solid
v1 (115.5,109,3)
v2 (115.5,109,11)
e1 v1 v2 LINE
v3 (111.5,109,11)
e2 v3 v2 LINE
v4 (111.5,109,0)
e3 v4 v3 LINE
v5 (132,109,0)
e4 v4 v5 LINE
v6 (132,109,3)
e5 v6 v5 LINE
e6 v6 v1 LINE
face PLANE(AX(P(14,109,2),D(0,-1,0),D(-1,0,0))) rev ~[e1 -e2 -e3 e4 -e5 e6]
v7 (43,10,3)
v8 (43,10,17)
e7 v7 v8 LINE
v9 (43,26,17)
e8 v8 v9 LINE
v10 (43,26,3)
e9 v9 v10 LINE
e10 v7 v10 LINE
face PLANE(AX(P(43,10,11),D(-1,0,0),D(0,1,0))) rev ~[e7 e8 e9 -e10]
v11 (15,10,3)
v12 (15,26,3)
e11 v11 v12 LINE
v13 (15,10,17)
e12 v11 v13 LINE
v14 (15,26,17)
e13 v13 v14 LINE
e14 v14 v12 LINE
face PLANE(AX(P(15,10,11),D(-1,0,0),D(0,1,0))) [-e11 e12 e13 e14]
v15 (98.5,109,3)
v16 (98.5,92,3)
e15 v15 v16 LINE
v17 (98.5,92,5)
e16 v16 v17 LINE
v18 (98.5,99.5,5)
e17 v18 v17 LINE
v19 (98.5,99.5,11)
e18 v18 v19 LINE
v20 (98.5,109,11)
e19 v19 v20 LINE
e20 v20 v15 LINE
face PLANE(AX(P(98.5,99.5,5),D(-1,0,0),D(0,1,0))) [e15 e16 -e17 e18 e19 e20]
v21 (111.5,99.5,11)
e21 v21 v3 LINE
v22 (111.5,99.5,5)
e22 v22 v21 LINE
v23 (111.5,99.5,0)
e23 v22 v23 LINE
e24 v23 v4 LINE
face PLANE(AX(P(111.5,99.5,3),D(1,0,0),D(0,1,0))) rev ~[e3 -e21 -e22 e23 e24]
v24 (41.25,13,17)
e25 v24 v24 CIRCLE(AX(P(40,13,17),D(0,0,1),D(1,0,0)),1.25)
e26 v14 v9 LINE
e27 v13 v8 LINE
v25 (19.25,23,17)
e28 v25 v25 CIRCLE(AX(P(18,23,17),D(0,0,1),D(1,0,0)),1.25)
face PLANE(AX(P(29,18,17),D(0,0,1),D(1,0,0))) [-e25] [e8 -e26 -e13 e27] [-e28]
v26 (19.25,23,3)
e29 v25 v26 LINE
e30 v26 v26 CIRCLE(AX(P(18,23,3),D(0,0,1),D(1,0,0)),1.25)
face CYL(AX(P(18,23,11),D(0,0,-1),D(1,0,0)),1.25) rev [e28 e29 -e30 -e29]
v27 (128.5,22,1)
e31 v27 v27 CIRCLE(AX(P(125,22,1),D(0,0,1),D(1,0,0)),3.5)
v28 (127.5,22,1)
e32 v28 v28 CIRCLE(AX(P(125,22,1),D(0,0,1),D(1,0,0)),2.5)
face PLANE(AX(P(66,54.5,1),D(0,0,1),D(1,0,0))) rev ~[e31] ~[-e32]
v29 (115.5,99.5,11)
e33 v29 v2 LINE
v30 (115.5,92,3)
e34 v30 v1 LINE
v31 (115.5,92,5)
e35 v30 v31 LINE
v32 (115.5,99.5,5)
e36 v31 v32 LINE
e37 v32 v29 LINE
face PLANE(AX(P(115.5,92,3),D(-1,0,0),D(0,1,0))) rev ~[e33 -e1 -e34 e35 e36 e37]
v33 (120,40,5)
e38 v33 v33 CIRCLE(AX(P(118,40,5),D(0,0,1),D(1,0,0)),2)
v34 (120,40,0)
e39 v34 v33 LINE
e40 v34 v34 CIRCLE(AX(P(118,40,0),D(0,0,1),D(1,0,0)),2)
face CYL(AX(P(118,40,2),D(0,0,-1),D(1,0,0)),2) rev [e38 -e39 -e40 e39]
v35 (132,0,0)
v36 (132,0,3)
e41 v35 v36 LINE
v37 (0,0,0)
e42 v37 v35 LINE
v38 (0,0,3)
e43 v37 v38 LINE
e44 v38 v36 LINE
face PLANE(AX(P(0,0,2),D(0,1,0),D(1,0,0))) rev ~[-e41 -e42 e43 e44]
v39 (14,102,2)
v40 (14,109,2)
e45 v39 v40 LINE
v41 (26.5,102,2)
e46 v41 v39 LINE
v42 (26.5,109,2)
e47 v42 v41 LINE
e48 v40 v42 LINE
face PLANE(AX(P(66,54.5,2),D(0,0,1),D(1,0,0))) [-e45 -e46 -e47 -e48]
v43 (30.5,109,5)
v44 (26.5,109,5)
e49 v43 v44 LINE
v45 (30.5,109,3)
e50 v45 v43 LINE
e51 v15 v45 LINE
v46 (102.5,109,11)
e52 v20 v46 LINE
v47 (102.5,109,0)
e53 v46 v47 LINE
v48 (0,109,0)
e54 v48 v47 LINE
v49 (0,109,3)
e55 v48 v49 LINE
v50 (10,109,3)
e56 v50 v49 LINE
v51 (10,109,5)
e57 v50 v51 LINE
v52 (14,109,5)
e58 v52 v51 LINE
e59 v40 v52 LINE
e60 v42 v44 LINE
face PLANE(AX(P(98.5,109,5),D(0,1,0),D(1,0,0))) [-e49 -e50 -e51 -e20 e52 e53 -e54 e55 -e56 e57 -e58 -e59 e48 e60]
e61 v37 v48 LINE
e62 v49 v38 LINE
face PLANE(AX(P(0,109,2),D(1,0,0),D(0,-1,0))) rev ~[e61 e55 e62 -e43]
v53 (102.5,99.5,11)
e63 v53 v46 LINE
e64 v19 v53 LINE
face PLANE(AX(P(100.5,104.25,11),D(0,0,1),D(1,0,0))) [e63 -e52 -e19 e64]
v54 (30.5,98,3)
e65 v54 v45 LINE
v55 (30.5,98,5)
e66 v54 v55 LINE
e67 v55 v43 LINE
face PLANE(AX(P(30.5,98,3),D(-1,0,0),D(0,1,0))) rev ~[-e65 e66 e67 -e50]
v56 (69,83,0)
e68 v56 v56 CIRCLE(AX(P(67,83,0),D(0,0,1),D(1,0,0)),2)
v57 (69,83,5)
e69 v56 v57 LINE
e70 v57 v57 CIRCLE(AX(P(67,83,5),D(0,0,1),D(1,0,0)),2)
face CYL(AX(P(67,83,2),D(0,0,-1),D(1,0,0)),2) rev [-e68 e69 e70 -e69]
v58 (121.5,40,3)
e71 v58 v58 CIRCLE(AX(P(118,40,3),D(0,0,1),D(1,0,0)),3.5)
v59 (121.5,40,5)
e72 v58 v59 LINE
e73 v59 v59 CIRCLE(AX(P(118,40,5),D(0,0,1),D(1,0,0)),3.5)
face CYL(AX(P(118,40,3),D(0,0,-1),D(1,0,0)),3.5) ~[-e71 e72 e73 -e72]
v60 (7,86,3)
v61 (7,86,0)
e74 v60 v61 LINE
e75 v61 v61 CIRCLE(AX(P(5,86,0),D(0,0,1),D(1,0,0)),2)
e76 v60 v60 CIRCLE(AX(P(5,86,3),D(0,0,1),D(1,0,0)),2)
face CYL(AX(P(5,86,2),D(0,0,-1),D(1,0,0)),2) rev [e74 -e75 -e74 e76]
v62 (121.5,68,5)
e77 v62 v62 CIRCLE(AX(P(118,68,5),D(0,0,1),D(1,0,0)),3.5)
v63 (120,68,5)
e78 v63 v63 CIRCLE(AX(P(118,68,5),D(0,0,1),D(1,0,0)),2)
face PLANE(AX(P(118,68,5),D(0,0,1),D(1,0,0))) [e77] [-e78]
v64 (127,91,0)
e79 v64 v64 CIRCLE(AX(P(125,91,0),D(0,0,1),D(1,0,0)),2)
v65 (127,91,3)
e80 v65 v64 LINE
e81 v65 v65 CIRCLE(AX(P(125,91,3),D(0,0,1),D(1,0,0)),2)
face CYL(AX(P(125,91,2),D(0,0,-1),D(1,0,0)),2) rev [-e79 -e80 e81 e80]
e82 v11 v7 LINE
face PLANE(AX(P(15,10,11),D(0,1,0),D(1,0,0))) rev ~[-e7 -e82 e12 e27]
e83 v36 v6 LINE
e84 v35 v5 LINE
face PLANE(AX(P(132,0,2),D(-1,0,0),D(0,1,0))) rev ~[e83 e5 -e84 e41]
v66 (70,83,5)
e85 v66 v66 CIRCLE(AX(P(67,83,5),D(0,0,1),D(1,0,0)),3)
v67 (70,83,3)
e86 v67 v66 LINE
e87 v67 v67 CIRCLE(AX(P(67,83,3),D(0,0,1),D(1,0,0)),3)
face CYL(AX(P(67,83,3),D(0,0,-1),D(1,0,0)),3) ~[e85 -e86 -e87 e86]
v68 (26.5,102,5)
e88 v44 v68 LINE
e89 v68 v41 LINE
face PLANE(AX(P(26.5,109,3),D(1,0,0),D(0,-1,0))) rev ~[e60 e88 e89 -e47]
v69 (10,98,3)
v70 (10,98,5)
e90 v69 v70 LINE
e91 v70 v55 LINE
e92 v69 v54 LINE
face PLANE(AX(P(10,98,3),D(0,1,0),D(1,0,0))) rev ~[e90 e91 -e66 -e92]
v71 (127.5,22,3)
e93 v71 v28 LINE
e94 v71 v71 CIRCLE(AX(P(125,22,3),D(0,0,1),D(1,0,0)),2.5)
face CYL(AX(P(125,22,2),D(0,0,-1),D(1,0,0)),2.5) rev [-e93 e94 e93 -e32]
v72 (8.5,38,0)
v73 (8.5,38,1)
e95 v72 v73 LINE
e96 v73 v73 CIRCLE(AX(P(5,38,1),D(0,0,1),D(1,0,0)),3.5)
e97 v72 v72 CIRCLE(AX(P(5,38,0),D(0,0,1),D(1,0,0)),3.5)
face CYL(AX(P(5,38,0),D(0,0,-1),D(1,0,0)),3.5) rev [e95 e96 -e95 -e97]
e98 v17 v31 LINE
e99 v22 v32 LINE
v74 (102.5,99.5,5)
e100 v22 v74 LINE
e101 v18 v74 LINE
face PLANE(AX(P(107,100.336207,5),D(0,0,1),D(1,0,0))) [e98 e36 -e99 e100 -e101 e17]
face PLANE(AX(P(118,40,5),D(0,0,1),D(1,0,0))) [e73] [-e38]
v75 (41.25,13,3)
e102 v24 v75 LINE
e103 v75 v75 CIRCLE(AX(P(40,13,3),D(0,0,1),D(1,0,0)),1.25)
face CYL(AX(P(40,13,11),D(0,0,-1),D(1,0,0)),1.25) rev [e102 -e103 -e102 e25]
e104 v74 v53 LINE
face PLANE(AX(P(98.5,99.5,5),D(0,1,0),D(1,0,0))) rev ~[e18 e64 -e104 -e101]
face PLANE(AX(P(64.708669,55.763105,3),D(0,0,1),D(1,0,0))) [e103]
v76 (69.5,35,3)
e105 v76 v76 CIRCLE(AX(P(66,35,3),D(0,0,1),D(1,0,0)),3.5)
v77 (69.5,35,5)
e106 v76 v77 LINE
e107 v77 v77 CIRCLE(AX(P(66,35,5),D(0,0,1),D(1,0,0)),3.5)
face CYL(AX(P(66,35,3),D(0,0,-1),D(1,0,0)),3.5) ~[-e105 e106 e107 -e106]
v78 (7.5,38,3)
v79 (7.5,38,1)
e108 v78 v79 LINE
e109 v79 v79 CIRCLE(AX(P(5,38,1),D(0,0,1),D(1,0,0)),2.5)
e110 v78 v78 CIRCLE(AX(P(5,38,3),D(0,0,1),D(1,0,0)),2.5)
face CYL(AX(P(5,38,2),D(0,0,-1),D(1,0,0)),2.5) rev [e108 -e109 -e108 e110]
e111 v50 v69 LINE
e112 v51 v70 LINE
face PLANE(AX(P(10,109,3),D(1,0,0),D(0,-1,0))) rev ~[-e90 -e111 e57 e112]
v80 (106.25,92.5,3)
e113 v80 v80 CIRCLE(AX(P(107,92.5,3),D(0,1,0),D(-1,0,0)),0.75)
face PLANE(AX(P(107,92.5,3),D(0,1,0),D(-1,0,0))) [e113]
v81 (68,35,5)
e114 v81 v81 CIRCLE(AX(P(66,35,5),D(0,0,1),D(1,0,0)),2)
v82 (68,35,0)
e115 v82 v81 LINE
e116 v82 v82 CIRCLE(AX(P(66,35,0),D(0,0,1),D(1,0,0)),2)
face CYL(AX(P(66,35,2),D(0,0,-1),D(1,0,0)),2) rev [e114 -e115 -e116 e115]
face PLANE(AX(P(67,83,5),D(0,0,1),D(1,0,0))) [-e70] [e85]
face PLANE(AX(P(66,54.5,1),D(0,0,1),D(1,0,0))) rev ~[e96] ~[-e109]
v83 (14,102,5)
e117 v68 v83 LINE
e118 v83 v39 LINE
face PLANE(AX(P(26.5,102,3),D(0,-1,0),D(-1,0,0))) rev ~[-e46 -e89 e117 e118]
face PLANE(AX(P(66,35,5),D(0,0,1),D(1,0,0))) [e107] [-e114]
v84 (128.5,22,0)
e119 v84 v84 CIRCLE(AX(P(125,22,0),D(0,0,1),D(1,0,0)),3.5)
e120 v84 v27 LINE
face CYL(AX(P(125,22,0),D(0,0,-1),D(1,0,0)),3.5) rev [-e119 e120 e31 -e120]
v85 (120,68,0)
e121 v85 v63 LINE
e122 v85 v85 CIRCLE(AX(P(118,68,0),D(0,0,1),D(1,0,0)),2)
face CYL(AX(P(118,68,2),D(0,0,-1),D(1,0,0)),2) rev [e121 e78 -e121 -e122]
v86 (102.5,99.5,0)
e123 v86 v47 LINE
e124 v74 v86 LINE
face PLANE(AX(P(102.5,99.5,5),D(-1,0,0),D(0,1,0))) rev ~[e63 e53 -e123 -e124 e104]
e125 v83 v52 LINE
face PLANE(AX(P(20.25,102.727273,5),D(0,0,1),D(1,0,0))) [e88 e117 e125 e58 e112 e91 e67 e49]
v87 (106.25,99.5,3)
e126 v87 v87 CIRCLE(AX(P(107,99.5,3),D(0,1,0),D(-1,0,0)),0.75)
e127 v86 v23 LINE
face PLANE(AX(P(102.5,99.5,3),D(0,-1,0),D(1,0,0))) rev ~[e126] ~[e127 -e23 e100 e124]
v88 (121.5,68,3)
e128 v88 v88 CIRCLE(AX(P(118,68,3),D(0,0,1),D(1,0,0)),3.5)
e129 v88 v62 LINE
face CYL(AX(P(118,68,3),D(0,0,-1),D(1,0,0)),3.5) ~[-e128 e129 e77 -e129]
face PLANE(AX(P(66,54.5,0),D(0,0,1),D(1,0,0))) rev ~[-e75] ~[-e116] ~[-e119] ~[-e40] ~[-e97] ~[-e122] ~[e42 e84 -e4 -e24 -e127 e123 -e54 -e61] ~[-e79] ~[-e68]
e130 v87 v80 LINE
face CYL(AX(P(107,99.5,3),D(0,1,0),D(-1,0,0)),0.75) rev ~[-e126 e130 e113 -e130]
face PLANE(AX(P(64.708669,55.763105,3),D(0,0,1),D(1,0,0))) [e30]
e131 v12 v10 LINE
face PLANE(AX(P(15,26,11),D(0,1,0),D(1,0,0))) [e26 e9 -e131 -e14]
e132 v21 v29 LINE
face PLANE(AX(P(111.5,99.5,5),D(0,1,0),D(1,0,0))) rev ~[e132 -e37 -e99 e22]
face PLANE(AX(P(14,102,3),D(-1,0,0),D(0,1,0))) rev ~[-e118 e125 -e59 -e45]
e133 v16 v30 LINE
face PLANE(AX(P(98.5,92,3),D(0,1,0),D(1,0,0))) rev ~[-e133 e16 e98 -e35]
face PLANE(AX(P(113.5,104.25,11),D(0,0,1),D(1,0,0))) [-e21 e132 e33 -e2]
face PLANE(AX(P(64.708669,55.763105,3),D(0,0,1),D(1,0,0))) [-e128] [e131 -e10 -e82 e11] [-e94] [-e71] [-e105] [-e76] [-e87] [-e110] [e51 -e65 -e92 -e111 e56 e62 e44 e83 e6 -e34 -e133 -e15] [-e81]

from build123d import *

# Parameters (mm, degrees)
F0_W      = 132
F0_H      = 109
F0_R      = 3.5
F0_R_2    = 2
F1_DEPTH  = 1
F2_W      = 132
F2_H      = 109
F2_R      = 3.5
F2_R_2    = 2
F2_R_3    = 2.5
F3_DEPTH  = 1
F4_R      = 2.5
F4_R_2    = 2
F5_DEPTH  = 1
F6_W      = 9
F6_H      = 9.5
F7_DEPTH  = 3
F8_R      = 3
F8_R_2    = 2
F8_R_3    = 3.5
F8_W      = 28
F8_H      = 16
F8_R_4    = 1.25
F9_DEPTH  = 2
F10_W     = 4
F10_H     = 9.5
F9_FACE_W = 28
F9_FACE_H = 16
F9_FACE_R = 1.25
F11_DEPTH = 6
F12_R     = 0.75
F13_DEPTH = 7
F14_W     = 28
F14_H     = 16
F14_R     = 1.25
F15_DEPTH = 6


# Not quite as in the source:
# - a feature names something its author has since deleted; it is built from what else it names


with BuildPart() as f1:
    # F0 (on Top) → F1 (new body)
    with BuildSketch(Plane.XY):
        with Locations((66, 54.5)):
            Rectangle(F0_W, F0_H)
        with Locations((5, 38)):
            Circle(F0_R, mode=Mode.SUBTRACT)
        with Locations((125, 22)):
            Circle(F0_R, mode=Mode.SUBTRACT)
        with Locations((66, 35)):
            Circle(F0_R_2, mode=Mode.SUBTRACT)
        with Locations((118, 40)):
            Circle(F0_R_2, mode=Mode.SUBTRACT)
        with Locations((5, 86)):
            Circle(F0_R_2, mode=Mode.SUBTRACT)
        with Locations((118, 68)):
            Circle(F0_R_2, mode=Mode.SUBTRACT)
        with Locations((67, 83)):
            Circle(F0_R_2, mode=Mode.SUBTRACT)
        with Locations((125, 91)):
            Circle(F0_R_2, mode=Mode.SUBTRACT)
    extrude(amount=F1_DEPTH)

    # F2 (on face) → F3 (join)
    with BuildSketch(Plane.XY.offset(1)):
        with Locations((66, 54.5)):
            Rectangle(F2_W, F2_H)
        with Locations((5, 38)):
            Circle(F2_R, mode=Mode.SUBTRACT)
        with Locations((125, 22)):
            Circle(F2_R, mode=Mode.SUBTRACT)
        with Locations((66, 35)):
            Circle(F2_R_2, mode=Mode.SUBTRACT)
        with Locations((118, 40)):
            Circle(F2_R_2, mode=Mode.SUBTRACT)
        with Locations((5, 86)):
            Circle(F2_R_2, mode=Mode.SUBTRACT)
        with Locations((118, 68)):
            Circle(F2_R_2, mode=Mode.SUBTRACT)
        with Locations((67, 83)):
            Circle(F2_R_2, mode=Mode.SUBTRACT)
        with Locations((125, 91)):
            Circle(F2_R_2, mode=Mode.SUBTRACT)
        with Locations((125, 22)):
            Circle(F2_R)
        with Locations((125, 22)):
            Circle(F2_R_3, mode=Mode.SUBTRACT)
        with Locations((5, 38)):
            Circle(F2_R)
        with Locations((5, 38)):
            Circle(F2_R_3, mode=Mode.SUBTRACT)
    extrude(amount=F3_DEPTH)

    # F4 (on face) → F5 (join)
    with BuildSketch(Plane.XY.offset(2)):
        Polygon((14, 102), (14, 109), (0, 109), (0, 0), (132, 0), (132, 109), (26.5, 109), (26.5, 102), align=None)
        with Locations((5, 38)):
            Circle(F4_R, mode=Mode.SUBTRACT)
        with Locations((125, 22)):
            Circle(F4_R, mode=Mode.SUBTRACT)
        with Locations((66, 35)):
            Circle(F4_R_2, mode=Mode.SUBTRACT)
        with Locations((118, 40)):
            Circle(F4_R_2, mode=Mode.SUBTRACT)
        with Locations((5, 86)):
            Circle(F4_R_2, mode=Mode.SUBTRACT)
        with Locations((118, 68)):
            Circle(F4_R_2, mode=Mode.SUBTRACT)
        with Locations((67, 83)):
            Circle(F4_R_2, mode=Mode.SUBTRACT)
        with Locations((125, 91)):
            Circle(F4_R_2, mode=Mode.SUBTRACT)
    extrude(amount=F5_DEPTH)

    # F6 (on face) → F7 (cut)
    with BuildSketch(Plane.XY.offset(3)):
        with Locations((107, 104.25)):
            Rectangle(F6_W, F6_H)
    extrude(amount=-F7_DEPTH, mode=Mode.SUBTRACT)

    # F8 (on face) → F9 (join)
    with BuildSketch(Plane.XY.offset(3)):
        Polygon((14, 102), (14, 109), (10, 109), (10, 98), (30.5, 98), (30.5, 109), (26.5, 109), (26.5, 102), align=None)
        Polygon((102.5, 109), (98.5, 109), (98.5, 92), (115.5, 92), (115.5, 109), (111.5, 109), (111.5, 99.5), (102.5, 99.5), align=None)
        with Locations((67, 83)):
            Circle(F8_R)
        with Locations((67, 83)):
            Circle(F8_R_2, mode=Mode.SUBTRACT)
        with Locations((66, 35)):
            Circle(F8_R_3)
        with Locations((66, 35)):
            Circle(F8_R_2, mode=Mode.SUBTRACT)
        with Locations((118, 68)):
            Circle(F8_R_3)
        with Locations((118, 68)):
            Circle(F8_R_2, mode=Mode.SUBTRACT)
        with Locations((118, 40)):
            Circle(F8_R_3)
        with Locations((118, 40)):
            Circle(F8_R_2, mode=Mode.SUBTRACT)
        with Locations((29, 18)):
            Rectangle(F8_W, F8_H)
        with Locations((18, 23)):
            Circle(F8_R_4, mode=Mode.SUBTRACT)
        with Locations((40, 13)):
            Circle(F8_R_4, mode=Mode.SUBTRACT)
    extrude(amount=F9_DEPTH)

    # F10 (on face) + F9_face (on face) → F11 (join)
    with BuildSketch(Plane.XY.offset(5)):
        with Locations((100.5, 104.25)):
            Rectangle(F10_W, F10_H)
        with Locations((113.5, 104.25)):
            Rectangle(F10_W, F10_H)
    with BuildSketch(Plane(origin=(67, 83, 5), x_dir=(1, 0, 0), z_dir=(0, 0, 1))):
        with Locations((-38, -65)):
            Rectangle(F9_FACE_W, F9_FACE_H)
        with Locations((-49, -60)):
            Circle(F9_FACE_R, mode=Mode.SUBTRACT)
        with Locations((-27, -70)):
            Circle(F9_FACE_R, mode=Mode.SUBTRACT)
    extrude(amount=F11_DEPTH)

    # F12 (on face) → F13 (cut)
    with BuildSketch(Plane(origin=(0, 99.5, 0), x_dir=(-1, 0, 0), z_dir=(0, 1, 0))):
        with Locations((-107, 3)):
            Circle(F12_R)
    extrude(amount=-F13_DEPTH, mode=Mode.SUBTRACT)

    # F14 (on face) → F15 (join)
    with BuildSketch(Plane.XY.offset(11)):
        with Locations((29, 18)):
            Rectangle(F14_W, F14_H)
        with Locations((40, 13)):
            Circle(F14_R, mode=Mode.SUBTRACT)
        with Locations((18, 23)):
            Circle(F14_R, mode=Mode.SUBTRACT)
    extrude(amount=F15_DEPTH)


solid = f1.part
